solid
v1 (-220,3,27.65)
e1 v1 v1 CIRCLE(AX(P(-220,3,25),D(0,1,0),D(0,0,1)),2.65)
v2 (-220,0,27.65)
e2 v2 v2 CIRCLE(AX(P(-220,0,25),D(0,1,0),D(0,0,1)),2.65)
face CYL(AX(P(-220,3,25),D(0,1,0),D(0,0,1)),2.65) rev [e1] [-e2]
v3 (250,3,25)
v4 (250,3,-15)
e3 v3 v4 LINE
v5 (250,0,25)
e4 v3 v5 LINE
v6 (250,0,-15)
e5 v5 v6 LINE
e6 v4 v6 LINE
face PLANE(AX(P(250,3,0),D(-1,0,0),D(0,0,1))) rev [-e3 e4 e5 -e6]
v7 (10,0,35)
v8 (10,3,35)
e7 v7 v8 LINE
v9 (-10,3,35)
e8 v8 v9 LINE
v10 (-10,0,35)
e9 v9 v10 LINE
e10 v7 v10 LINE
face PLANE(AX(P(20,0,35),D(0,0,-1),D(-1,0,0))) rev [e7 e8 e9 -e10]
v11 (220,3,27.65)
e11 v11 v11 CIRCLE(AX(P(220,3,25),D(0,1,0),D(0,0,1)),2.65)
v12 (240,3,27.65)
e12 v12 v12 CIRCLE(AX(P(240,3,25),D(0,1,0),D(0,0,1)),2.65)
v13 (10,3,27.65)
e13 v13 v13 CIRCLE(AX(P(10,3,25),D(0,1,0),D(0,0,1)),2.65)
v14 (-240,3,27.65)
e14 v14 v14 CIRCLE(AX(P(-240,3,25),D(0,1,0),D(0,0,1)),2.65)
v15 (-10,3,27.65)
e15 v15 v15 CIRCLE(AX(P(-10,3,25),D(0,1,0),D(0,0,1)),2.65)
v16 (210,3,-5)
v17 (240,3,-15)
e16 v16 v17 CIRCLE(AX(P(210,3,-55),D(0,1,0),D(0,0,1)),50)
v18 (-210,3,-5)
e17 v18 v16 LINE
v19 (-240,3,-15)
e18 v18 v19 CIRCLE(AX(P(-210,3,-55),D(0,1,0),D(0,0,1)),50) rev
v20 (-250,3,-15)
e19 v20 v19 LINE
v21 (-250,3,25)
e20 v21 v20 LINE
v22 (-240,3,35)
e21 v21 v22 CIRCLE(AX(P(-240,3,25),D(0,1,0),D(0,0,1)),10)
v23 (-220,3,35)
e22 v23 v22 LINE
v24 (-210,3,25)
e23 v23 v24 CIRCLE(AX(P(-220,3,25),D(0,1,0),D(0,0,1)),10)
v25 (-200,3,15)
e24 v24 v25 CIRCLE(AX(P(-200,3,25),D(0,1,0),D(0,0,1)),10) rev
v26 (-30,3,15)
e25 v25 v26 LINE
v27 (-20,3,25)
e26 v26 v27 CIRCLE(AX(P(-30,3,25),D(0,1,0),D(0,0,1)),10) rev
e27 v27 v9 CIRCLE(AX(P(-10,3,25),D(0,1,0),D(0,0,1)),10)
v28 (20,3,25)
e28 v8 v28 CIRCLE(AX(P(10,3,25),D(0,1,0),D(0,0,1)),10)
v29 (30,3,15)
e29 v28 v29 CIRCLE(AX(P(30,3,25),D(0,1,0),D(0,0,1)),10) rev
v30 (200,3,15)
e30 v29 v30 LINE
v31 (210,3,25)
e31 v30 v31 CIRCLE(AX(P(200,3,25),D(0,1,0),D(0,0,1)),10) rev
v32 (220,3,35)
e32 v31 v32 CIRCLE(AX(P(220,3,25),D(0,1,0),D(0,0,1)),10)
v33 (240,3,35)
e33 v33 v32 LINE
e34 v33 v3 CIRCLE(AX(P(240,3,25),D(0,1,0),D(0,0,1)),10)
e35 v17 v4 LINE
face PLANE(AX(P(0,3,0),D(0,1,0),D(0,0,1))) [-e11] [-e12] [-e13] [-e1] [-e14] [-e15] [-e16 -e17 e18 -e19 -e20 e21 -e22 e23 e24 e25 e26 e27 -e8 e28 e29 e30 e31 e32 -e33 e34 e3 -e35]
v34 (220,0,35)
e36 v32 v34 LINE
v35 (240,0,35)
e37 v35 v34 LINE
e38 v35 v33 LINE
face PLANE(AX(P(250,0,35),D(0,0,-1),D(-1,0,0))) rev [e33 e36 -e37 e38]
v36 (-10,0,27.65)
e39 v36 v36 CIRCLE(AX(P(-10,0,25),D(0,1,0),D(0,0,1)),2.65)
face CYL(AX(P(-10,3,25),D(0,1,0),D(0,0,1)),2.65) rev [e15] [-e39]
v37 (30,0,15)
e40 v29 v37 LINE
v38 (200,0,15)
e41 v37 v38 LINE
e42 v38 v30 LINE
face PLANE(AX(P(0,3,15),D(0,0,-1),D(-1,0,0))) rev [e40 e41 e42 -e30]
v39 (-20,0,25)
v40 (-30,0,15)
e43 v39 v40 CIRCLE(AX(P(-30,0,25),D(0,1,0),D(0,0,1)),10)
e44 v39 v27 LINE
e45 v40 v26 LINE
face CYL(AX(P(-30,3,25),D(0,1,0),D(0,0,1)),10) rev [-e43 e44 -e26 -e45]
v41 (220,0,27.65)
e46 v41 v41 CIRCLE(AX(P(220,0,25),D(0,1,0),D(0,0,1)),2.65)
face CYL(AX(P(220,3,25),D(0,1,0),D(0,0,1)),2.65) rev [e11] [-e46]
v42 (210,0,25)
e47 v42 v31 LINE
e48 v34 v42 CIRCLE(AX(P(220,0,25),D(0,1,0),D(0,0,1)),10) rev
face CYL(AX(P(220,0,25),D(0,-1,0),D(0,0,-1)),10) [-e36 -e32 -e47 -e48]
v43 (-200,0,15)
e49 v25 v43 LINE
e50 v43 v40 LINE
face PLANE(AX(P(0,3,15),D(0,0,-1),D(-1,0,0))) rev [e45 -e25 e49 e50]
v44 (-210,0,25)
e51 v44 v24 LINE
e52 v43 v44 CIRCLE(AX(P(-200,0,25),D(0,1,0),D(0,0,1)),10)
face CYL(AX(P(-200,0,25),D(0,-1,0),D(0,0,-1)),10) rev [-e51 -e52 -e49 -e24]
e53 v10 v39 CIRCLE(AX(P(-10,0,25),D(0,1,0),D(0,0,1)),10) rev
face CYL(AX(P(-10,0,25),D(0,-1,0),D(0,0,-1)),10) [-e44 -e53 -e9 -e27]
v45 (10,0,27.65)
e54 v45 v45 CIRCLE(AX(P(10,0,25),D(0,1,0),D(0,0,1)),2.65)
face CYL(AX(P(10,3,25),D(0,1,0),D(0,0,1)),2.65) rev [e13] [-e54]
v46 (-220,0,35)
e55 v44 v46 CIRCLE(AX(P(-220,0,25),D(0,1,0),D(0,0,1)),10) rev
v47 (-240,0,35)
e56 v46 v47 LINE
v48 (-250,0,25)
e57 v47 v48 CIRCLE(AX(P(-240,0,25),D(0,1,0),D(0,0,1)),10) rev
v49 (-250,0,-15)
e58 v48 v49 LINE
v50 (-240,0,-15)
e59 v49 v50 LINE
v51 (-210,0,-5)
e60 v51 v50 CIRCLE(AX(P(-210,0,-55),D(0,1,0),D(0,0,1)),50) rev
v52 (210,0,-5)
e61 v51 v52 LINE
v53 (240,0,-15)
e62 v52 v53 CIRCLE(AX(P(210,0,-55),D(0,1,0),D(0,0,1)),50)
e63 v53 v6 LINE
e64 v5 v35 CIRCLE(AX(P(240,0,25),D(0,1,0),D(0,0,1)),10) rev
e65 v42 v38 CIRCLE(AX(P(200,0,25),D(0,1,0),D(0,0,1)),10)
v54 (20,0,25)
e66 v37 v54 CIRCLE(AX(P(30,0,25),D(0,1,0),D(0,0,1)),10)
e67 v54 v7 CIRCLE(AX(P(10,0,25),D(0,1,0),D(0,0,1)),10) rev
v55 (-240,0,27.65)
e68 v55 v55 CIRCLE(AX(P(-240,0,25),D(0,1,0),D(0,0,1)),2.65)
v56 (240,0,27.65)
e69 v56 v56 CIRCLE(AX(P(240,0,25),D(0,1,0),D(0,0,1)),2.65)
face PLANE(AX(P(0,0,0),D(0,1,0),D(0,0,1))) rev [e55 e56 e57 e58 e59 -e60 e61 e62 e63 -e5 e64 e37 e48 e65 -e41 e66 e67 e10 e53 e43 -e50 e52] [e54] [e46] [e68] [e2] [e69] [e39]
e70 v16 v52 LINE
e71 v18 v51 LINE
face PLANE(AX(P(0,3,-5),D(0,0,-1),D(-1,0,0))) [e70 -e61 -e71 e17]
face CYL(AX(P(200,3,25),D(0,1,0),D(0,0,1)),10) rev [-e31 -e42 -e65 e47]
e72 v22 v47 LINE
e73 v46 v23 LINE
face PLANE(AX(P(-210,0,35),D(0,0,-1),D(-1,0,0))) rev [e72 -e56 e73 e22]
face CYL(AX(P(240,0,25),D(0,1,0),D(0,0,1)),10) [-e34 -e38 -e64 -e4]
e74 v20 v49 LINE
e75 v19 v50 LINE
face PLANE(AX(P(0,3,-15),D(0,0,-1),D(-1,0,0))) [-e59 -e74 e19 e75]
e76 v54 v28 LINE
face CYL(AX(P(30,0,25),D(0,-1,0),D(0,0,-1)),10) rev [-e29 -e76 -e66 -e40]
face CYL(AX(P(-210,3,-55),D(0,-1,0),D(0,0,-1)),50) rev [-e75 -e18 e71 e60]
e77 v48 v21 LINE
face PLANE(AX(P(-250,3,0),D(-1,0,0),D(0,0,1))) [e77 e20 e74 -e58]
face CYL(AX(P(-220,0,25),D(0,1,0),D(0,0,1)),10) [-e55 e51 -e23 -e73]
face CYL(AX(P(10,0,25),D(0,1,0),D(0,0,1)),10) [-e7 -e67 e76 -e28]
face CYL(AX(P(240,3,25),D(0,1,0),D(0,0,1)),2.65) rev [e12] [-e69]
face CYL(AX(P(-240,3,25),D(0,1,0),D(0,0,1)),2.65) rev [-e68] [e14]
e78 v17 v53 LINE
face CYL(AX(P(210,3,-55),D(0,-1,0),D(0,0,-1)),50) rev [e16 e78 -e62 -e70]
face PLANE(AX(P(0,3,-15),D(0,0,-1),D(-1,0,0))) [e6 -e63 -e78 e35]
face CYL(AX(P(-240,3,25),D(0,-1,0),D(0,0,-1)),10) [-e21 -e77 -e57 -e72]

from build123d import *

# Parameters (mm, degrees)
EXTRUDE_1_DEPTH        = 3
SKETCH_2_W             = 40
SKETCH_2_H             = 20
EXTRUDE_2_DEPTH        = 3
HOLE_WIZARD_M51_D      = 5.3
PATTERN_LINEAR_1_COUNT = 3
PATTERN_LINEAR_1_PITCH = 230
FILLET_1_R             = 10


with BuildPart() as part:
    # Эскиз1 → Бобышка-Вытянуть1 (new body)
    with BuildSketch(Plane(origin=(0, 0, 0), x_dir=(1, 0, 0), z_dir=(0, 1, 0))):
        with BuildLine():
            Line((210, 5), (-210, 5))
            ThreePointArc((-210, 5), (-225.811388301, 7.565835097), (-240, 15))
            Line((-240, 15), (-250, 15))
            Line((-250, 15), (-250, -15))
            Line((-250, -15), (250, -15))
            Line((250, -15), (250, 15))
            Line((250, 15), (240, 15))
            ThreePointArc((240, 15), (225.811388301, 7.565835097), (210, 5))
        make_face()
    extrude(amount=EXTRUDE_1_DEPTH)

    # Эскиз2 → Бобышка-Вытянуть2 (add)
    with BuildSketch(Plane(origin=(0, 3, 0), x_dir=(1, 0, 0), z_dir=(0, 1, 0))):
        with Locations((230, -25)):
            Rectangle(SKETCH_2_W, SKETCH_2_H)
    extrude_2 = extrude(amount=-EXTRUDE_2_DEPTH)

    # Отверстие с зазором M51 (through all)
    with Locations(Plane(origin=(0, 3, 0), x_dir=(1, 0, 0), z_dir=(0, 1, 0))):
        with Locations((220, -25), (240, -25)):
            hole_wizard_m51 = Hole(HOLE_WIZARD_M51_D / 2)

    # Линейный массив1: Бобышка-Вытянуть2, Отверстие с зазором M51 ×3
    with Locations(*[(-i * PATTERN_LINEAR_1_PITCH, 0, 0) for i in range(1, PATTERN_LINEAR_1_COUNT)]):
        add(extrude_2)
        add(hole_wizard_m51, mode=Mode.SUBTRACT)

    # Скругление1
    fillet_1_edges = [part.edges().sort_by_distance(p)[0] for p in [
        (-250, 1.5, 35),
        (-210, 1.5, 35),
        (-210, 1.5, 15),
        (-20, 1.5, 15),
        (-20, 1.5, 35),
        (20, 1.5, 35),
        (20, 1.5, 15),
        (210, 1.5, 15),
        (250, 1.5, 35),
        (210, 1.5, 35),
    ]]
    fillet(fillet_1_edges, radius=FILLET_1_R - 0.0001)  # a hair under: the kernel refuses the full size


solid = part.part
